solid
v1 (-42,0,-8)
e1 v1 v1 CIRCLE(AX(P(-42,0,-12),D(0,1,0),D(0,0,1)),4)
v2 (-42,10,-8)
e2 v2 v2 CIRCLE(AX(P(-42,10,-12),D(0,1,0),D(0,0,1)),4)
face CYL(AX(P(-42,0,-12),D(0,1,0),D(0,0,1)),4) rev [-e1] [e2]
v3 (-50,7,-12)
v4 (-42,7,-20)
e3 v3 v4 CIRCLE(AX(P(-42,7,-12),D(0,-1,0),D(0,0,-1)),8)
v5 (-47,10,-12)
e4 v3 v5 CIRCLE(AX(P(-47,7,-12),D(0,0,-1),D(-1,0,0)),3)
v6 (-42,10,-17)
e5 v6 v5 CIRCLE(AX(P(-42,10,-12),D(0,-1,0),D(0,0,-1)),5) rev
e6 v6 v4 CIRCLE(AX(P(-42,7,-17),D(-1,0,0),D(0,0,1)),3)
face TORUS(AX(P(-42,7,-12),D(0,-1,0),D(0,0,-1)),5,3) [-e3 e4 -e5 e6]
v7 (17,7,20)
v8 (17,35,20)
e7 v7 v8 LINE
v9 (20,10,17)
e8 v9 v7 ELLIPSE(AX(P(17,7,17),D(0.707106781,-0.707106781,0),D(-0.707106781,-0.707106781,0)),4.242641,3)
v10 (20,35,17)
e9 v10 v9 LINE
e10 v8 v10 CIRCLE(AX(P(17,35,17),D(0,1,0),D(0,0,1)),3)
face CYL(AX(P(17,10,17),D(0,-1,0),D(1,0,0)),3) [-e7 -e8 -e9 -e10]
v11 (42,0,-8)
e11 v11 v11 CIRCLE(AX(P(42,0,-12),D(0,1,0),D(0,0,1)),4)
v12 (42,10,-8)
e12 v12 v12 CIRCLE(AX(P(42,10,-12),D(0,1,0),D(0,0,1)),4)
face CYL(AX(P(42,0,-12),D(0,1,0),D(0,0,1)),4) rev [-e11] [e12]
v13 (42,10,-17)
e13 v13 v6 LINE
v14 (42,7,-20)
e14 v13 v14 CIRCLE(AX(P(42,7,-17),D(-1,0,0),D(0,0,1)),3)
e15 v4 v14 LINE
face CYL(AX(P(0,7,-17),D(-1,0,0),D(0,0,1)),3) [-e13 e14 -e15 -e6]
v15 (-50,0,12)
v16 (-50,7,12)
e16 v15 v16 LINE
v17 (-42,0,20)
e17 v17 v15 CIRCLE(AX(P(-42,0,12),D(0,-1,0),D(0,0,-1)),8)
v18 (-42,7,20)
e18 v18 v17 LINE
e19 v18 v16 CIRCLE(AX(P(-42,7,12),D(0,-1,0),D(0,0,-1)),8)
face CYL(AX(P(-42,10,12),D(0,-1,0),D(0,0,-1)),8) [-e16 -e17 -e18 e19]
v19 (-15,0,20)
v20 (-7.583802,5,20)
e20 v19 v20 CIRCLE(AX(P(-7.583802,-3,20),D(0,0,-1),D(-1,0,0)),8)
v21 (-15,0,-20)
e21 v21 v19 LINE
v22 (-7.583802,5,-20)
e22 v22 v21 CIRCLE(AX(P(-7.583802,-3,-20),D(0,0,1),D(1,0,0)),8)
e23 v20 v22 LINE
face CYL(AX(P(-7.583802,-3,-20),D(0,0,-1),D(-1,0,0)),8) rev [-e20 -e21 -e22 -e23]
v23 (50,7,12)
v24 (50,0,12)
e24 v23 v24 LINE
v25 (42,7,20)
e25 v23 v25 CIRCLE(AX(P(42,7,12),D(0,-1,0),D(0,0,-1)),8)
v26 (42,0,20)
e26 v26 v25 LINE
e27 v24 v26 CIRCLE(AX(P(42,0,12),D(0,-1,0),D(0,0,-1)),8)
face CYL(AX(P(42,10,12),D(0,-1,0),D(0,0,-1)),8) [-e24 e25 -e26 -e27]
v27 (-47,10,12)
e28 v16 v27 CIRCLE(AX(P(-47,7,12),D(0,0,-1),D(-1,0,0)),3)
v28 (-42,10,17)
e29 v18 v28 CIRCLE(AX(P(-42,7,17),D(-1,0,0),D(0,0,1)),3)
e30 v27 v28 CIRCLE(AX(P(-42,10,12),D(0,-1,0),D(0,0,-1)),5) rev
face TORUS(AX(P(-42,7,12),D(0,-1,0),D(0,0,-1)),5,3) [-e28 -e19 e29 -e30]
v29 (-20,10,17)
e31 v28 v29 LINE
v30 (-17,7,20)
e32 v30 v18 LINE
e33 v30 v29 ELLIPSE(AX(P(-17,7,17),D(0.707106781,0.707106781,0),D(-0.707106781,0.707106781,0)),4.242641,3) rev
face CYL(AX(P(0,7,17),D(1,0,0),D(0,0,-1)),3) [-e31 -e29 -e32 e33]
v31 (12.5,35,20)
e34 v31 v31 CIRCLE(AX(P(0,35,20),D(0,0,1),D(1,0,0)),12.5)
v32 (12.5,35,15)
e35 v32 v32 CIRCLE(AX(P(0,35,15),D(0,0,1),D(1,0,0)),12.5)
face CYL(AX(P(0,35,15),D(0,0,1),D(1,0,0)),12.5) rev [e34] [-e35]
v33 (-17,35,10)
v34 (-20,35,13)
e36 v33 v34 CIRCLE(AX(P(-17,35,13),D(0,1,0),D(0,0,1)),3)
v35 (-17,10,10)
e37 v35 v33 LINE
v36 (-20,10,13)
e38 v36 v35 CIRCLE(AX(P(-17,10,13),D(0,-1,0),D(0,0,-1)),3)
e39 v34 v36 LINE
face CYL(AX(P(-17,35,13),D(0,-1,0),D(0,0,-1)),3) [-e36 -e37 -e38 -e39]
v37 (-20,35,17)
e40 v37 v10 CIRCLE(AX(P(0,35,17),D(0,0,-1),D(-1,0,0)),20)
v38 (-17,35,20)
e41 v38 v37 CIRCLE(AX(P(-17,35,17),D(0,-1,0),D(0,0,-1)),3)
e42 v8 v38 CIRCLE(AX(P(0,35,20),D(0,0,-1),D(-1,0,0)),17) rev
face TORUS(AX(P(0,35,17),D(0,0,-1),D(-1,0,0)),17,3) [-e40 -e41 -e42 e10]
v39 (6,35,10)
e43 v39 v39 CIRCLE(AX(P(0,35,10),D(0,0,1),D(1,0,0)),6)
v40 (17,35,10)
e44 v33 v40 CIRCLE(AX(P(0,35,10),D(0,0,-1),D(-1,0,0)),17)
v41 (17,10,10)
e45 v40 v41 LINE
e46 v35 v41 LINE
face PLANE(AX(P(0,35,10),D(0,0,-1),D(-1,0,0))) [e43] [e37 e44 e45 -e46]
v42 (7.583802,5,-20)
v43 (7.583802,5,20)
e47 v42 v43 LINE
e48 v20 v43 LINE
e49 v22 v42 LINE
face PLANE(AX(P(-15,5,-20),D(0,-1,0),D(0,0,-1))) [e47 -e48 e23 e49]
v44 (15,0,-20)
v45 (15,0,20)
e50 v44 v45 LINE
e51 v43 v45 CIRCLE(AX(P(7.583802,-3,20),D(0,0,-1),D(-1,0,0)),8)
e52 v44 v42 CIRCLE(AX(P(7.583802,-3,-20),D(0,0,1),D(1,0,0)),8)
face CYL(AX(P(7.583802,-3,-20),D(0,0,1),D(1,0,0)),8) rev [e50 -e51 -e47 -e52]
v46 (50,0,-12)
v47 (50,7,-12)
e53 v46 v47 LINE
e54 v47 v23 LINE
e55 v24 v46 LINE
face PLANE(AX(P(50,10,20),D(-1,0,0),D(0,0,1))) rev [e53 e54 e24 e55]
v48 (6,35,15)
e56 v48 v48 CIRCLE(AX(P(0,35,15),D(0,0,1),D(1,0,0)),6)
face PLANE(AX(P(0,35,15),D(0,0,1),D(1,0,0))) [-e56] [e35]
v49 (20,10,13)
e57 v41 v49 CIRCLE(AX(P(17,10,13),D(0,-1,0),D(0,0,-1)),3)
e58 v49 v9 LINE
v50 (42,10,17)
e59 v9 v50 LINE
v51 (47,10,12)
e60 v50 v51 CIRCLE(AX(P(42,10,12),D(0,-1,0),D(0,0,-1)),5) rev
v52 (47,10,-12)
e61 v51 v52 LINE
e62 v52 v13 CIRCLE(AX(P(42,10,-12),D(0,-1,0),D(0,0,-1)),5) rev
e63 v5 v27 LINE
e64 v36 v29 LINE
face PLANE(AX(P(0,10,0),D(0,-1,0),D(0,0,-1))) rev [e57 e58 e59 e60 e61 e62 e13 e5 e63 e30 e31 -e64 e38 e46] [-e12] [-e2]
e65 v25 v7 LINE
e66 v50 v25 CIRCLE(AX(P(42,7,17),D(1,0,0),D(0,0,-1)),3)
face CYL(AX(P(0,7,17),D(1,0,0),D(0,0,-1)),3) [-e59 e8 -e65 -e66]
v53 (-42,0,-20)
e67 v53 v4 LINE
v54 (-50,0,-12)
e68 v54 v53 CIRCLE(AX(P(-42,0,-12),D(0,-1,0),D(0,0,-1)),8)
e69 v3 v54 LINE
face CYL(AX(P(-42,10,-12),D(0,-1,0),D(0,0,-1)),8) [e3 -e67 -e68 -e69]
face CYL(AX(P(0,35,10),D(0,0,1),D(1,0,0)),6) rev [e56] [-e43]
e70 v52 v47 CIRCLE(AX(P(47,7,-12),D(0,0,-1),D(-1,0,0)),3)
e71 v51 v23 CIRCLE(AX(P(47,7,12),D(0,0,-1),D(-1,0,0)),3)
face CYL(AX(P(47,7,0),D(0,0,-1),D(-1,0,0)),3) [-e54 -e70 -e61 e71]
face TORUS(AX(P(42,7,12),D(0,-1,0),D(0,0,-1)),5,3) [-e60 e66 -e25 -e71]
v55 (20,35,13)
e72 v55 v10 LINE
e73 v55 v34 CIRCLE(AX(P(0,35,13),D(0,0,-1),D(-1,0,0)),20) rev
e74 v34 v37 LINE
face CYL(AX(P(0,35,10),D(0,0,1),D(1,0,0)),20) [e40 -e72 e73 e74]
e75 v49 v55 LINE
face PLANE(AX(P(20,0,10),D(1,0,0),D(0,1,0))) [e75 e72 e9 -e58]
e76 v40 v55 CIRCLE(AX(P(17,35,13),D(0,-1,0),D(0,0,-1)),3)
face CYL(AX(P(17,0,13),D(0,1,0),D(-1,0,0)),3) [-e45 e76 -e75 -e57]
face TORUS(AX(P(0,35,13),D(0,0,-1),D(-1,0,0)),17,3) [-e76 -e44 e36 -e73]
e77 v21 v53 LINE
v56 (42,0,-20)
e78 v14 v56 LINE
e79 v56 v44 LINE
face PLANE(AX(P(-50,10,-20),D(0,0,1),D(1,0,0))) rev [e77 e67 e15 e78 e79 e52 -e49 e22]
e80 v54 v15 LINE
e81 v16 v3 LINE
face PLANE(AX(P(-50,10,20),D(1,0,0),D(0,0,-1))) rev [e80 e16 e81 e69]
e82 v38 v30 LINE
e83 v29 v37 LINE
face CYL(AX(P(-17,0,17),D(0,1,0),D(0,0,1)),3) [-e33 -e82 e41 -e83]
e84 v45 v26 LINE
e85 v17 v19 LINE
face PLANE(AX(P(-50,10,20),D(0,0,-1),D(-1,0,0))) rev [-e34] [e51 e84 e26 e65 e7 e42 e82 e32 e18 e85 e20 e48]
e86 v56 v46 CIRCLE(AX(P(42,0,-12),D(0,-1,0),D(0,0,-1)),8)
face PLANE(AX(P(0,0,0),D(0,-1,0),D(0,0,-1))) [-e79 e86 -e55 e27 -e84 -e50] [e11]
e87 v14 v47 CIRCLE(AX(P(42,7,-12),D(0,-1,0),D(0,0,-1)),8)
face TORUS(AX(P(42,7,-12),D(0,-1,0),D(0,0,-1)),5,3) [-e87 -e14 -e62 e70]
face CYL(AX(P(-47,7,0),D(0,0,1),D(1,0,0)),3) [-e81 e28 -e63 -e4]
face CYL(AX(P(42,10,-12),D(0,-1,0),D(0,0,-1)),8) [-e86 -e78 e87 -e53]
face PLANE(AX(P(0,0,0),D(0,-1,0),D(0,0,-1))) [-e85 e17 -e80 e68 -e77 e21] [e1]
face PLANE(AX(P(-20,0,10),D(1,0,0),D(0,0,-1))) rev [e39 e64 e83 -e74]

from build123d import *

# Parameters (mm, degrees)
SKETCH_1_W          = 100
SKETCH_1_H          = 40
EXTRUDE_1_DEPTH     = 10
EXTRUDE_2_DEPTH     = 10
SKETCH_3_R          = 12.5
CUT_EXTRUDE_1_DEPTH = 5
SKETCH_7_R          = 6
CUT_EXTRUDE_2_DEPTH = 5
SKETCH_10_W         = 30
SKETCH_10_H         = 5
CUT_EXTRUDE_3_DEPTH = 85.409715081
SKETCH_14_R         = 4
CUT_EXTRUDE_4_DEPTH = 71.178344238
FILLET_2_R          = 8
FILLET_3_R          = 3


with BuildPart() as part:
    # Эскиз1 → Бобышка-Вытянуть1 (new body)
    with BuildSketch(Plane(origin=(0, 0, 0), x_dir=(1, 0, 0), z_dir=(0, 1, 0))):
        Rectangle(SKETCH_1_W, SKETCH_1_H)
    extrude(amount=EXTRUDE_1_DEPTH)

    # Эскиз2 → Бобышка-Вытянуть2 (add)
    with BuildSketch(Plane.XY.offset(20)):
        with BuildLine():
            Line((-20, 0), (-20, 35))
            ThreePointArc((-20, 35), (0, 55), (20, 35))
            Line((20, 35), (20, 0))
            Line((20, 0), (-20, 0))
        make_face()
    extrude(amount=-EXTRUDE_2_DEPTH)

    # Эскиз3 → Вырез-Вытянуть1 (cut)
    with BuildSketch(Plane.XY.offset(20)):
        with Locations((0, 35)):
            Circle(SKETCH_3_R)
    extrude(amount=-CUT_EXTRUDE_1_DEPTH, mode=Mode.SUBTRACT)

    # Эскиз7 → Вырез-Вытянуть2 (cut)
    with BuildSketch(Plane.XY.offset(15)):
        with Locations((0, 35)):
            Circle(SKETCH_7_R)
    extrude(amount=-CUT_EXTRUDE_2_DEPTH, mode=Mode.SUBTRACT)

    # Эскиз10 → Вырез-Вытянуть3 (cut, through all)
    with BuildSketch(Plane.XY.offset(20)):
        with Locations((0, 2.5)):
            Rectangle(SKETCH_10_W, SKETCH_10_H)
    extrude(amount=-CUT_EXTRUDE_3_DEPTH, mode=Mode.SUBTRACT)

    # Эскиз14 → Вырез-Вытянуть4 (cut, through all)
    with BuildSketch(Plane(origin=(0, 10, 0), x_dir=(1, 0, 0), z_dir=(0, 1, 0))):
        with Locations(Location((-42, 12, 0), (0, 0, 270))):
            Circle(SKETCH_14_R)
        with Locations(Location((42, 12, 0), (0, 0, 270))):
            Circle(SKETCH_14_R)
    extrude(amount=-CUT_EXTRUDE_4_DEPTH, mode=Mode.SUBTRACT)

    # Скругление2
    # the kernel refuses this fillet: 8 mm, written as the material it adds along each edge
    with BuildSketch(Plane(origin=(-15, 5, 20), x_dir=(0, -1, 0), z_dir=(0, 0, -1))) as fillet_2_piece_1:
        with BuildLine():
            CenterArc((8, -7.416198487), FILLET_2_R, 112.024312837, 67.975687163)
            Line((0, -7.416198487), (0, 0))
            Line((0, 0), (5, 0))
        make_face()
    extrude(amount=40)
    with BuildSketch(Plane(origin=(15, 5, 20), x_dir=(-1, 0, 0), z_dir=(0, 0, -1))) as fillet_2_piece_2:
        with BuildLine():
            CenterArc((7.416198487, -8), FILLET_2_R, 90, 67.975687163)
            Line((0, -5), (0, 0))
            Line((0, 0), (7.416198487, 0))
        make_face()
    extrude(amount=40)
    # the kernel refuses this fillet: 8 mm, written as the material it takes off along each edge
    with BuildSketch(Plane(origin=(50, -20, 20), x_dir=(-1, 0, 0), z_dir=(0, 1, 0)), Plane(origin=(50, -20, -20), x_dir=(0, 0, 1), z_dir=(0, 1, 0))) as fillet_2_2_piece_1:
        with BuildLine():
            CenterArc((FILLET_2_R, -FILLET_2_R), FILLET_2_R, 90, 90)
            Line((0, -FILLET_2_R), (0, 0))
            Line((0, 0), (FILLET_2_R, 0))
        make_face()
    extrude(amount=50, mode=Mode.SUBTRACT)
    with BuildSketch(Plane(origin=(-50, -20, 20), x_dir=(1, 0, 0), z_dir=(0, 1, 0)), Plane(origin=(-50, -20, -20), x_dir=(0, 0, 1), z_dir=(0, 1, 0))) as fillet_2_2_piece_2:
        with BuildLine():
            CenterArc((FILLET_2_R, FILLET_2_R), FILLET_2_R, 180, 90)
            Line((0, FILLET_2_R), (0, 0))
            Line((0, 0), (FILLET_2_R, 0))
        make_face()
    extrude(amount=50, mode=Mode.SUBTRACT)

    # Скругление3
    fillet_3_edges = [part.edges().sort_by_distance(p)[0] for p in [
        (31, 10, 20),
        (-20, 22.5, 20),
        (20, 22.5, 10),
        (-20, 22.5, 10),
        (0, 55, 10),
        (20, 22.5, 20),
        (0, 55, 20),
        (50, 10, 0),
        (-31, 10, 20),
        (0, 10, -20),
        (-50, 10, 0),
        (47.656854249, 10, -17.656854249),
        (-47.656854249, 10, -17.656854249),
        (-47.656854249, 10, 17.656854249),
        (47.656854249, 10, 17.656854249),
    ]]
    fillet(fillet_3_edges, radius=FILLET_3_R)


solid = part.part
